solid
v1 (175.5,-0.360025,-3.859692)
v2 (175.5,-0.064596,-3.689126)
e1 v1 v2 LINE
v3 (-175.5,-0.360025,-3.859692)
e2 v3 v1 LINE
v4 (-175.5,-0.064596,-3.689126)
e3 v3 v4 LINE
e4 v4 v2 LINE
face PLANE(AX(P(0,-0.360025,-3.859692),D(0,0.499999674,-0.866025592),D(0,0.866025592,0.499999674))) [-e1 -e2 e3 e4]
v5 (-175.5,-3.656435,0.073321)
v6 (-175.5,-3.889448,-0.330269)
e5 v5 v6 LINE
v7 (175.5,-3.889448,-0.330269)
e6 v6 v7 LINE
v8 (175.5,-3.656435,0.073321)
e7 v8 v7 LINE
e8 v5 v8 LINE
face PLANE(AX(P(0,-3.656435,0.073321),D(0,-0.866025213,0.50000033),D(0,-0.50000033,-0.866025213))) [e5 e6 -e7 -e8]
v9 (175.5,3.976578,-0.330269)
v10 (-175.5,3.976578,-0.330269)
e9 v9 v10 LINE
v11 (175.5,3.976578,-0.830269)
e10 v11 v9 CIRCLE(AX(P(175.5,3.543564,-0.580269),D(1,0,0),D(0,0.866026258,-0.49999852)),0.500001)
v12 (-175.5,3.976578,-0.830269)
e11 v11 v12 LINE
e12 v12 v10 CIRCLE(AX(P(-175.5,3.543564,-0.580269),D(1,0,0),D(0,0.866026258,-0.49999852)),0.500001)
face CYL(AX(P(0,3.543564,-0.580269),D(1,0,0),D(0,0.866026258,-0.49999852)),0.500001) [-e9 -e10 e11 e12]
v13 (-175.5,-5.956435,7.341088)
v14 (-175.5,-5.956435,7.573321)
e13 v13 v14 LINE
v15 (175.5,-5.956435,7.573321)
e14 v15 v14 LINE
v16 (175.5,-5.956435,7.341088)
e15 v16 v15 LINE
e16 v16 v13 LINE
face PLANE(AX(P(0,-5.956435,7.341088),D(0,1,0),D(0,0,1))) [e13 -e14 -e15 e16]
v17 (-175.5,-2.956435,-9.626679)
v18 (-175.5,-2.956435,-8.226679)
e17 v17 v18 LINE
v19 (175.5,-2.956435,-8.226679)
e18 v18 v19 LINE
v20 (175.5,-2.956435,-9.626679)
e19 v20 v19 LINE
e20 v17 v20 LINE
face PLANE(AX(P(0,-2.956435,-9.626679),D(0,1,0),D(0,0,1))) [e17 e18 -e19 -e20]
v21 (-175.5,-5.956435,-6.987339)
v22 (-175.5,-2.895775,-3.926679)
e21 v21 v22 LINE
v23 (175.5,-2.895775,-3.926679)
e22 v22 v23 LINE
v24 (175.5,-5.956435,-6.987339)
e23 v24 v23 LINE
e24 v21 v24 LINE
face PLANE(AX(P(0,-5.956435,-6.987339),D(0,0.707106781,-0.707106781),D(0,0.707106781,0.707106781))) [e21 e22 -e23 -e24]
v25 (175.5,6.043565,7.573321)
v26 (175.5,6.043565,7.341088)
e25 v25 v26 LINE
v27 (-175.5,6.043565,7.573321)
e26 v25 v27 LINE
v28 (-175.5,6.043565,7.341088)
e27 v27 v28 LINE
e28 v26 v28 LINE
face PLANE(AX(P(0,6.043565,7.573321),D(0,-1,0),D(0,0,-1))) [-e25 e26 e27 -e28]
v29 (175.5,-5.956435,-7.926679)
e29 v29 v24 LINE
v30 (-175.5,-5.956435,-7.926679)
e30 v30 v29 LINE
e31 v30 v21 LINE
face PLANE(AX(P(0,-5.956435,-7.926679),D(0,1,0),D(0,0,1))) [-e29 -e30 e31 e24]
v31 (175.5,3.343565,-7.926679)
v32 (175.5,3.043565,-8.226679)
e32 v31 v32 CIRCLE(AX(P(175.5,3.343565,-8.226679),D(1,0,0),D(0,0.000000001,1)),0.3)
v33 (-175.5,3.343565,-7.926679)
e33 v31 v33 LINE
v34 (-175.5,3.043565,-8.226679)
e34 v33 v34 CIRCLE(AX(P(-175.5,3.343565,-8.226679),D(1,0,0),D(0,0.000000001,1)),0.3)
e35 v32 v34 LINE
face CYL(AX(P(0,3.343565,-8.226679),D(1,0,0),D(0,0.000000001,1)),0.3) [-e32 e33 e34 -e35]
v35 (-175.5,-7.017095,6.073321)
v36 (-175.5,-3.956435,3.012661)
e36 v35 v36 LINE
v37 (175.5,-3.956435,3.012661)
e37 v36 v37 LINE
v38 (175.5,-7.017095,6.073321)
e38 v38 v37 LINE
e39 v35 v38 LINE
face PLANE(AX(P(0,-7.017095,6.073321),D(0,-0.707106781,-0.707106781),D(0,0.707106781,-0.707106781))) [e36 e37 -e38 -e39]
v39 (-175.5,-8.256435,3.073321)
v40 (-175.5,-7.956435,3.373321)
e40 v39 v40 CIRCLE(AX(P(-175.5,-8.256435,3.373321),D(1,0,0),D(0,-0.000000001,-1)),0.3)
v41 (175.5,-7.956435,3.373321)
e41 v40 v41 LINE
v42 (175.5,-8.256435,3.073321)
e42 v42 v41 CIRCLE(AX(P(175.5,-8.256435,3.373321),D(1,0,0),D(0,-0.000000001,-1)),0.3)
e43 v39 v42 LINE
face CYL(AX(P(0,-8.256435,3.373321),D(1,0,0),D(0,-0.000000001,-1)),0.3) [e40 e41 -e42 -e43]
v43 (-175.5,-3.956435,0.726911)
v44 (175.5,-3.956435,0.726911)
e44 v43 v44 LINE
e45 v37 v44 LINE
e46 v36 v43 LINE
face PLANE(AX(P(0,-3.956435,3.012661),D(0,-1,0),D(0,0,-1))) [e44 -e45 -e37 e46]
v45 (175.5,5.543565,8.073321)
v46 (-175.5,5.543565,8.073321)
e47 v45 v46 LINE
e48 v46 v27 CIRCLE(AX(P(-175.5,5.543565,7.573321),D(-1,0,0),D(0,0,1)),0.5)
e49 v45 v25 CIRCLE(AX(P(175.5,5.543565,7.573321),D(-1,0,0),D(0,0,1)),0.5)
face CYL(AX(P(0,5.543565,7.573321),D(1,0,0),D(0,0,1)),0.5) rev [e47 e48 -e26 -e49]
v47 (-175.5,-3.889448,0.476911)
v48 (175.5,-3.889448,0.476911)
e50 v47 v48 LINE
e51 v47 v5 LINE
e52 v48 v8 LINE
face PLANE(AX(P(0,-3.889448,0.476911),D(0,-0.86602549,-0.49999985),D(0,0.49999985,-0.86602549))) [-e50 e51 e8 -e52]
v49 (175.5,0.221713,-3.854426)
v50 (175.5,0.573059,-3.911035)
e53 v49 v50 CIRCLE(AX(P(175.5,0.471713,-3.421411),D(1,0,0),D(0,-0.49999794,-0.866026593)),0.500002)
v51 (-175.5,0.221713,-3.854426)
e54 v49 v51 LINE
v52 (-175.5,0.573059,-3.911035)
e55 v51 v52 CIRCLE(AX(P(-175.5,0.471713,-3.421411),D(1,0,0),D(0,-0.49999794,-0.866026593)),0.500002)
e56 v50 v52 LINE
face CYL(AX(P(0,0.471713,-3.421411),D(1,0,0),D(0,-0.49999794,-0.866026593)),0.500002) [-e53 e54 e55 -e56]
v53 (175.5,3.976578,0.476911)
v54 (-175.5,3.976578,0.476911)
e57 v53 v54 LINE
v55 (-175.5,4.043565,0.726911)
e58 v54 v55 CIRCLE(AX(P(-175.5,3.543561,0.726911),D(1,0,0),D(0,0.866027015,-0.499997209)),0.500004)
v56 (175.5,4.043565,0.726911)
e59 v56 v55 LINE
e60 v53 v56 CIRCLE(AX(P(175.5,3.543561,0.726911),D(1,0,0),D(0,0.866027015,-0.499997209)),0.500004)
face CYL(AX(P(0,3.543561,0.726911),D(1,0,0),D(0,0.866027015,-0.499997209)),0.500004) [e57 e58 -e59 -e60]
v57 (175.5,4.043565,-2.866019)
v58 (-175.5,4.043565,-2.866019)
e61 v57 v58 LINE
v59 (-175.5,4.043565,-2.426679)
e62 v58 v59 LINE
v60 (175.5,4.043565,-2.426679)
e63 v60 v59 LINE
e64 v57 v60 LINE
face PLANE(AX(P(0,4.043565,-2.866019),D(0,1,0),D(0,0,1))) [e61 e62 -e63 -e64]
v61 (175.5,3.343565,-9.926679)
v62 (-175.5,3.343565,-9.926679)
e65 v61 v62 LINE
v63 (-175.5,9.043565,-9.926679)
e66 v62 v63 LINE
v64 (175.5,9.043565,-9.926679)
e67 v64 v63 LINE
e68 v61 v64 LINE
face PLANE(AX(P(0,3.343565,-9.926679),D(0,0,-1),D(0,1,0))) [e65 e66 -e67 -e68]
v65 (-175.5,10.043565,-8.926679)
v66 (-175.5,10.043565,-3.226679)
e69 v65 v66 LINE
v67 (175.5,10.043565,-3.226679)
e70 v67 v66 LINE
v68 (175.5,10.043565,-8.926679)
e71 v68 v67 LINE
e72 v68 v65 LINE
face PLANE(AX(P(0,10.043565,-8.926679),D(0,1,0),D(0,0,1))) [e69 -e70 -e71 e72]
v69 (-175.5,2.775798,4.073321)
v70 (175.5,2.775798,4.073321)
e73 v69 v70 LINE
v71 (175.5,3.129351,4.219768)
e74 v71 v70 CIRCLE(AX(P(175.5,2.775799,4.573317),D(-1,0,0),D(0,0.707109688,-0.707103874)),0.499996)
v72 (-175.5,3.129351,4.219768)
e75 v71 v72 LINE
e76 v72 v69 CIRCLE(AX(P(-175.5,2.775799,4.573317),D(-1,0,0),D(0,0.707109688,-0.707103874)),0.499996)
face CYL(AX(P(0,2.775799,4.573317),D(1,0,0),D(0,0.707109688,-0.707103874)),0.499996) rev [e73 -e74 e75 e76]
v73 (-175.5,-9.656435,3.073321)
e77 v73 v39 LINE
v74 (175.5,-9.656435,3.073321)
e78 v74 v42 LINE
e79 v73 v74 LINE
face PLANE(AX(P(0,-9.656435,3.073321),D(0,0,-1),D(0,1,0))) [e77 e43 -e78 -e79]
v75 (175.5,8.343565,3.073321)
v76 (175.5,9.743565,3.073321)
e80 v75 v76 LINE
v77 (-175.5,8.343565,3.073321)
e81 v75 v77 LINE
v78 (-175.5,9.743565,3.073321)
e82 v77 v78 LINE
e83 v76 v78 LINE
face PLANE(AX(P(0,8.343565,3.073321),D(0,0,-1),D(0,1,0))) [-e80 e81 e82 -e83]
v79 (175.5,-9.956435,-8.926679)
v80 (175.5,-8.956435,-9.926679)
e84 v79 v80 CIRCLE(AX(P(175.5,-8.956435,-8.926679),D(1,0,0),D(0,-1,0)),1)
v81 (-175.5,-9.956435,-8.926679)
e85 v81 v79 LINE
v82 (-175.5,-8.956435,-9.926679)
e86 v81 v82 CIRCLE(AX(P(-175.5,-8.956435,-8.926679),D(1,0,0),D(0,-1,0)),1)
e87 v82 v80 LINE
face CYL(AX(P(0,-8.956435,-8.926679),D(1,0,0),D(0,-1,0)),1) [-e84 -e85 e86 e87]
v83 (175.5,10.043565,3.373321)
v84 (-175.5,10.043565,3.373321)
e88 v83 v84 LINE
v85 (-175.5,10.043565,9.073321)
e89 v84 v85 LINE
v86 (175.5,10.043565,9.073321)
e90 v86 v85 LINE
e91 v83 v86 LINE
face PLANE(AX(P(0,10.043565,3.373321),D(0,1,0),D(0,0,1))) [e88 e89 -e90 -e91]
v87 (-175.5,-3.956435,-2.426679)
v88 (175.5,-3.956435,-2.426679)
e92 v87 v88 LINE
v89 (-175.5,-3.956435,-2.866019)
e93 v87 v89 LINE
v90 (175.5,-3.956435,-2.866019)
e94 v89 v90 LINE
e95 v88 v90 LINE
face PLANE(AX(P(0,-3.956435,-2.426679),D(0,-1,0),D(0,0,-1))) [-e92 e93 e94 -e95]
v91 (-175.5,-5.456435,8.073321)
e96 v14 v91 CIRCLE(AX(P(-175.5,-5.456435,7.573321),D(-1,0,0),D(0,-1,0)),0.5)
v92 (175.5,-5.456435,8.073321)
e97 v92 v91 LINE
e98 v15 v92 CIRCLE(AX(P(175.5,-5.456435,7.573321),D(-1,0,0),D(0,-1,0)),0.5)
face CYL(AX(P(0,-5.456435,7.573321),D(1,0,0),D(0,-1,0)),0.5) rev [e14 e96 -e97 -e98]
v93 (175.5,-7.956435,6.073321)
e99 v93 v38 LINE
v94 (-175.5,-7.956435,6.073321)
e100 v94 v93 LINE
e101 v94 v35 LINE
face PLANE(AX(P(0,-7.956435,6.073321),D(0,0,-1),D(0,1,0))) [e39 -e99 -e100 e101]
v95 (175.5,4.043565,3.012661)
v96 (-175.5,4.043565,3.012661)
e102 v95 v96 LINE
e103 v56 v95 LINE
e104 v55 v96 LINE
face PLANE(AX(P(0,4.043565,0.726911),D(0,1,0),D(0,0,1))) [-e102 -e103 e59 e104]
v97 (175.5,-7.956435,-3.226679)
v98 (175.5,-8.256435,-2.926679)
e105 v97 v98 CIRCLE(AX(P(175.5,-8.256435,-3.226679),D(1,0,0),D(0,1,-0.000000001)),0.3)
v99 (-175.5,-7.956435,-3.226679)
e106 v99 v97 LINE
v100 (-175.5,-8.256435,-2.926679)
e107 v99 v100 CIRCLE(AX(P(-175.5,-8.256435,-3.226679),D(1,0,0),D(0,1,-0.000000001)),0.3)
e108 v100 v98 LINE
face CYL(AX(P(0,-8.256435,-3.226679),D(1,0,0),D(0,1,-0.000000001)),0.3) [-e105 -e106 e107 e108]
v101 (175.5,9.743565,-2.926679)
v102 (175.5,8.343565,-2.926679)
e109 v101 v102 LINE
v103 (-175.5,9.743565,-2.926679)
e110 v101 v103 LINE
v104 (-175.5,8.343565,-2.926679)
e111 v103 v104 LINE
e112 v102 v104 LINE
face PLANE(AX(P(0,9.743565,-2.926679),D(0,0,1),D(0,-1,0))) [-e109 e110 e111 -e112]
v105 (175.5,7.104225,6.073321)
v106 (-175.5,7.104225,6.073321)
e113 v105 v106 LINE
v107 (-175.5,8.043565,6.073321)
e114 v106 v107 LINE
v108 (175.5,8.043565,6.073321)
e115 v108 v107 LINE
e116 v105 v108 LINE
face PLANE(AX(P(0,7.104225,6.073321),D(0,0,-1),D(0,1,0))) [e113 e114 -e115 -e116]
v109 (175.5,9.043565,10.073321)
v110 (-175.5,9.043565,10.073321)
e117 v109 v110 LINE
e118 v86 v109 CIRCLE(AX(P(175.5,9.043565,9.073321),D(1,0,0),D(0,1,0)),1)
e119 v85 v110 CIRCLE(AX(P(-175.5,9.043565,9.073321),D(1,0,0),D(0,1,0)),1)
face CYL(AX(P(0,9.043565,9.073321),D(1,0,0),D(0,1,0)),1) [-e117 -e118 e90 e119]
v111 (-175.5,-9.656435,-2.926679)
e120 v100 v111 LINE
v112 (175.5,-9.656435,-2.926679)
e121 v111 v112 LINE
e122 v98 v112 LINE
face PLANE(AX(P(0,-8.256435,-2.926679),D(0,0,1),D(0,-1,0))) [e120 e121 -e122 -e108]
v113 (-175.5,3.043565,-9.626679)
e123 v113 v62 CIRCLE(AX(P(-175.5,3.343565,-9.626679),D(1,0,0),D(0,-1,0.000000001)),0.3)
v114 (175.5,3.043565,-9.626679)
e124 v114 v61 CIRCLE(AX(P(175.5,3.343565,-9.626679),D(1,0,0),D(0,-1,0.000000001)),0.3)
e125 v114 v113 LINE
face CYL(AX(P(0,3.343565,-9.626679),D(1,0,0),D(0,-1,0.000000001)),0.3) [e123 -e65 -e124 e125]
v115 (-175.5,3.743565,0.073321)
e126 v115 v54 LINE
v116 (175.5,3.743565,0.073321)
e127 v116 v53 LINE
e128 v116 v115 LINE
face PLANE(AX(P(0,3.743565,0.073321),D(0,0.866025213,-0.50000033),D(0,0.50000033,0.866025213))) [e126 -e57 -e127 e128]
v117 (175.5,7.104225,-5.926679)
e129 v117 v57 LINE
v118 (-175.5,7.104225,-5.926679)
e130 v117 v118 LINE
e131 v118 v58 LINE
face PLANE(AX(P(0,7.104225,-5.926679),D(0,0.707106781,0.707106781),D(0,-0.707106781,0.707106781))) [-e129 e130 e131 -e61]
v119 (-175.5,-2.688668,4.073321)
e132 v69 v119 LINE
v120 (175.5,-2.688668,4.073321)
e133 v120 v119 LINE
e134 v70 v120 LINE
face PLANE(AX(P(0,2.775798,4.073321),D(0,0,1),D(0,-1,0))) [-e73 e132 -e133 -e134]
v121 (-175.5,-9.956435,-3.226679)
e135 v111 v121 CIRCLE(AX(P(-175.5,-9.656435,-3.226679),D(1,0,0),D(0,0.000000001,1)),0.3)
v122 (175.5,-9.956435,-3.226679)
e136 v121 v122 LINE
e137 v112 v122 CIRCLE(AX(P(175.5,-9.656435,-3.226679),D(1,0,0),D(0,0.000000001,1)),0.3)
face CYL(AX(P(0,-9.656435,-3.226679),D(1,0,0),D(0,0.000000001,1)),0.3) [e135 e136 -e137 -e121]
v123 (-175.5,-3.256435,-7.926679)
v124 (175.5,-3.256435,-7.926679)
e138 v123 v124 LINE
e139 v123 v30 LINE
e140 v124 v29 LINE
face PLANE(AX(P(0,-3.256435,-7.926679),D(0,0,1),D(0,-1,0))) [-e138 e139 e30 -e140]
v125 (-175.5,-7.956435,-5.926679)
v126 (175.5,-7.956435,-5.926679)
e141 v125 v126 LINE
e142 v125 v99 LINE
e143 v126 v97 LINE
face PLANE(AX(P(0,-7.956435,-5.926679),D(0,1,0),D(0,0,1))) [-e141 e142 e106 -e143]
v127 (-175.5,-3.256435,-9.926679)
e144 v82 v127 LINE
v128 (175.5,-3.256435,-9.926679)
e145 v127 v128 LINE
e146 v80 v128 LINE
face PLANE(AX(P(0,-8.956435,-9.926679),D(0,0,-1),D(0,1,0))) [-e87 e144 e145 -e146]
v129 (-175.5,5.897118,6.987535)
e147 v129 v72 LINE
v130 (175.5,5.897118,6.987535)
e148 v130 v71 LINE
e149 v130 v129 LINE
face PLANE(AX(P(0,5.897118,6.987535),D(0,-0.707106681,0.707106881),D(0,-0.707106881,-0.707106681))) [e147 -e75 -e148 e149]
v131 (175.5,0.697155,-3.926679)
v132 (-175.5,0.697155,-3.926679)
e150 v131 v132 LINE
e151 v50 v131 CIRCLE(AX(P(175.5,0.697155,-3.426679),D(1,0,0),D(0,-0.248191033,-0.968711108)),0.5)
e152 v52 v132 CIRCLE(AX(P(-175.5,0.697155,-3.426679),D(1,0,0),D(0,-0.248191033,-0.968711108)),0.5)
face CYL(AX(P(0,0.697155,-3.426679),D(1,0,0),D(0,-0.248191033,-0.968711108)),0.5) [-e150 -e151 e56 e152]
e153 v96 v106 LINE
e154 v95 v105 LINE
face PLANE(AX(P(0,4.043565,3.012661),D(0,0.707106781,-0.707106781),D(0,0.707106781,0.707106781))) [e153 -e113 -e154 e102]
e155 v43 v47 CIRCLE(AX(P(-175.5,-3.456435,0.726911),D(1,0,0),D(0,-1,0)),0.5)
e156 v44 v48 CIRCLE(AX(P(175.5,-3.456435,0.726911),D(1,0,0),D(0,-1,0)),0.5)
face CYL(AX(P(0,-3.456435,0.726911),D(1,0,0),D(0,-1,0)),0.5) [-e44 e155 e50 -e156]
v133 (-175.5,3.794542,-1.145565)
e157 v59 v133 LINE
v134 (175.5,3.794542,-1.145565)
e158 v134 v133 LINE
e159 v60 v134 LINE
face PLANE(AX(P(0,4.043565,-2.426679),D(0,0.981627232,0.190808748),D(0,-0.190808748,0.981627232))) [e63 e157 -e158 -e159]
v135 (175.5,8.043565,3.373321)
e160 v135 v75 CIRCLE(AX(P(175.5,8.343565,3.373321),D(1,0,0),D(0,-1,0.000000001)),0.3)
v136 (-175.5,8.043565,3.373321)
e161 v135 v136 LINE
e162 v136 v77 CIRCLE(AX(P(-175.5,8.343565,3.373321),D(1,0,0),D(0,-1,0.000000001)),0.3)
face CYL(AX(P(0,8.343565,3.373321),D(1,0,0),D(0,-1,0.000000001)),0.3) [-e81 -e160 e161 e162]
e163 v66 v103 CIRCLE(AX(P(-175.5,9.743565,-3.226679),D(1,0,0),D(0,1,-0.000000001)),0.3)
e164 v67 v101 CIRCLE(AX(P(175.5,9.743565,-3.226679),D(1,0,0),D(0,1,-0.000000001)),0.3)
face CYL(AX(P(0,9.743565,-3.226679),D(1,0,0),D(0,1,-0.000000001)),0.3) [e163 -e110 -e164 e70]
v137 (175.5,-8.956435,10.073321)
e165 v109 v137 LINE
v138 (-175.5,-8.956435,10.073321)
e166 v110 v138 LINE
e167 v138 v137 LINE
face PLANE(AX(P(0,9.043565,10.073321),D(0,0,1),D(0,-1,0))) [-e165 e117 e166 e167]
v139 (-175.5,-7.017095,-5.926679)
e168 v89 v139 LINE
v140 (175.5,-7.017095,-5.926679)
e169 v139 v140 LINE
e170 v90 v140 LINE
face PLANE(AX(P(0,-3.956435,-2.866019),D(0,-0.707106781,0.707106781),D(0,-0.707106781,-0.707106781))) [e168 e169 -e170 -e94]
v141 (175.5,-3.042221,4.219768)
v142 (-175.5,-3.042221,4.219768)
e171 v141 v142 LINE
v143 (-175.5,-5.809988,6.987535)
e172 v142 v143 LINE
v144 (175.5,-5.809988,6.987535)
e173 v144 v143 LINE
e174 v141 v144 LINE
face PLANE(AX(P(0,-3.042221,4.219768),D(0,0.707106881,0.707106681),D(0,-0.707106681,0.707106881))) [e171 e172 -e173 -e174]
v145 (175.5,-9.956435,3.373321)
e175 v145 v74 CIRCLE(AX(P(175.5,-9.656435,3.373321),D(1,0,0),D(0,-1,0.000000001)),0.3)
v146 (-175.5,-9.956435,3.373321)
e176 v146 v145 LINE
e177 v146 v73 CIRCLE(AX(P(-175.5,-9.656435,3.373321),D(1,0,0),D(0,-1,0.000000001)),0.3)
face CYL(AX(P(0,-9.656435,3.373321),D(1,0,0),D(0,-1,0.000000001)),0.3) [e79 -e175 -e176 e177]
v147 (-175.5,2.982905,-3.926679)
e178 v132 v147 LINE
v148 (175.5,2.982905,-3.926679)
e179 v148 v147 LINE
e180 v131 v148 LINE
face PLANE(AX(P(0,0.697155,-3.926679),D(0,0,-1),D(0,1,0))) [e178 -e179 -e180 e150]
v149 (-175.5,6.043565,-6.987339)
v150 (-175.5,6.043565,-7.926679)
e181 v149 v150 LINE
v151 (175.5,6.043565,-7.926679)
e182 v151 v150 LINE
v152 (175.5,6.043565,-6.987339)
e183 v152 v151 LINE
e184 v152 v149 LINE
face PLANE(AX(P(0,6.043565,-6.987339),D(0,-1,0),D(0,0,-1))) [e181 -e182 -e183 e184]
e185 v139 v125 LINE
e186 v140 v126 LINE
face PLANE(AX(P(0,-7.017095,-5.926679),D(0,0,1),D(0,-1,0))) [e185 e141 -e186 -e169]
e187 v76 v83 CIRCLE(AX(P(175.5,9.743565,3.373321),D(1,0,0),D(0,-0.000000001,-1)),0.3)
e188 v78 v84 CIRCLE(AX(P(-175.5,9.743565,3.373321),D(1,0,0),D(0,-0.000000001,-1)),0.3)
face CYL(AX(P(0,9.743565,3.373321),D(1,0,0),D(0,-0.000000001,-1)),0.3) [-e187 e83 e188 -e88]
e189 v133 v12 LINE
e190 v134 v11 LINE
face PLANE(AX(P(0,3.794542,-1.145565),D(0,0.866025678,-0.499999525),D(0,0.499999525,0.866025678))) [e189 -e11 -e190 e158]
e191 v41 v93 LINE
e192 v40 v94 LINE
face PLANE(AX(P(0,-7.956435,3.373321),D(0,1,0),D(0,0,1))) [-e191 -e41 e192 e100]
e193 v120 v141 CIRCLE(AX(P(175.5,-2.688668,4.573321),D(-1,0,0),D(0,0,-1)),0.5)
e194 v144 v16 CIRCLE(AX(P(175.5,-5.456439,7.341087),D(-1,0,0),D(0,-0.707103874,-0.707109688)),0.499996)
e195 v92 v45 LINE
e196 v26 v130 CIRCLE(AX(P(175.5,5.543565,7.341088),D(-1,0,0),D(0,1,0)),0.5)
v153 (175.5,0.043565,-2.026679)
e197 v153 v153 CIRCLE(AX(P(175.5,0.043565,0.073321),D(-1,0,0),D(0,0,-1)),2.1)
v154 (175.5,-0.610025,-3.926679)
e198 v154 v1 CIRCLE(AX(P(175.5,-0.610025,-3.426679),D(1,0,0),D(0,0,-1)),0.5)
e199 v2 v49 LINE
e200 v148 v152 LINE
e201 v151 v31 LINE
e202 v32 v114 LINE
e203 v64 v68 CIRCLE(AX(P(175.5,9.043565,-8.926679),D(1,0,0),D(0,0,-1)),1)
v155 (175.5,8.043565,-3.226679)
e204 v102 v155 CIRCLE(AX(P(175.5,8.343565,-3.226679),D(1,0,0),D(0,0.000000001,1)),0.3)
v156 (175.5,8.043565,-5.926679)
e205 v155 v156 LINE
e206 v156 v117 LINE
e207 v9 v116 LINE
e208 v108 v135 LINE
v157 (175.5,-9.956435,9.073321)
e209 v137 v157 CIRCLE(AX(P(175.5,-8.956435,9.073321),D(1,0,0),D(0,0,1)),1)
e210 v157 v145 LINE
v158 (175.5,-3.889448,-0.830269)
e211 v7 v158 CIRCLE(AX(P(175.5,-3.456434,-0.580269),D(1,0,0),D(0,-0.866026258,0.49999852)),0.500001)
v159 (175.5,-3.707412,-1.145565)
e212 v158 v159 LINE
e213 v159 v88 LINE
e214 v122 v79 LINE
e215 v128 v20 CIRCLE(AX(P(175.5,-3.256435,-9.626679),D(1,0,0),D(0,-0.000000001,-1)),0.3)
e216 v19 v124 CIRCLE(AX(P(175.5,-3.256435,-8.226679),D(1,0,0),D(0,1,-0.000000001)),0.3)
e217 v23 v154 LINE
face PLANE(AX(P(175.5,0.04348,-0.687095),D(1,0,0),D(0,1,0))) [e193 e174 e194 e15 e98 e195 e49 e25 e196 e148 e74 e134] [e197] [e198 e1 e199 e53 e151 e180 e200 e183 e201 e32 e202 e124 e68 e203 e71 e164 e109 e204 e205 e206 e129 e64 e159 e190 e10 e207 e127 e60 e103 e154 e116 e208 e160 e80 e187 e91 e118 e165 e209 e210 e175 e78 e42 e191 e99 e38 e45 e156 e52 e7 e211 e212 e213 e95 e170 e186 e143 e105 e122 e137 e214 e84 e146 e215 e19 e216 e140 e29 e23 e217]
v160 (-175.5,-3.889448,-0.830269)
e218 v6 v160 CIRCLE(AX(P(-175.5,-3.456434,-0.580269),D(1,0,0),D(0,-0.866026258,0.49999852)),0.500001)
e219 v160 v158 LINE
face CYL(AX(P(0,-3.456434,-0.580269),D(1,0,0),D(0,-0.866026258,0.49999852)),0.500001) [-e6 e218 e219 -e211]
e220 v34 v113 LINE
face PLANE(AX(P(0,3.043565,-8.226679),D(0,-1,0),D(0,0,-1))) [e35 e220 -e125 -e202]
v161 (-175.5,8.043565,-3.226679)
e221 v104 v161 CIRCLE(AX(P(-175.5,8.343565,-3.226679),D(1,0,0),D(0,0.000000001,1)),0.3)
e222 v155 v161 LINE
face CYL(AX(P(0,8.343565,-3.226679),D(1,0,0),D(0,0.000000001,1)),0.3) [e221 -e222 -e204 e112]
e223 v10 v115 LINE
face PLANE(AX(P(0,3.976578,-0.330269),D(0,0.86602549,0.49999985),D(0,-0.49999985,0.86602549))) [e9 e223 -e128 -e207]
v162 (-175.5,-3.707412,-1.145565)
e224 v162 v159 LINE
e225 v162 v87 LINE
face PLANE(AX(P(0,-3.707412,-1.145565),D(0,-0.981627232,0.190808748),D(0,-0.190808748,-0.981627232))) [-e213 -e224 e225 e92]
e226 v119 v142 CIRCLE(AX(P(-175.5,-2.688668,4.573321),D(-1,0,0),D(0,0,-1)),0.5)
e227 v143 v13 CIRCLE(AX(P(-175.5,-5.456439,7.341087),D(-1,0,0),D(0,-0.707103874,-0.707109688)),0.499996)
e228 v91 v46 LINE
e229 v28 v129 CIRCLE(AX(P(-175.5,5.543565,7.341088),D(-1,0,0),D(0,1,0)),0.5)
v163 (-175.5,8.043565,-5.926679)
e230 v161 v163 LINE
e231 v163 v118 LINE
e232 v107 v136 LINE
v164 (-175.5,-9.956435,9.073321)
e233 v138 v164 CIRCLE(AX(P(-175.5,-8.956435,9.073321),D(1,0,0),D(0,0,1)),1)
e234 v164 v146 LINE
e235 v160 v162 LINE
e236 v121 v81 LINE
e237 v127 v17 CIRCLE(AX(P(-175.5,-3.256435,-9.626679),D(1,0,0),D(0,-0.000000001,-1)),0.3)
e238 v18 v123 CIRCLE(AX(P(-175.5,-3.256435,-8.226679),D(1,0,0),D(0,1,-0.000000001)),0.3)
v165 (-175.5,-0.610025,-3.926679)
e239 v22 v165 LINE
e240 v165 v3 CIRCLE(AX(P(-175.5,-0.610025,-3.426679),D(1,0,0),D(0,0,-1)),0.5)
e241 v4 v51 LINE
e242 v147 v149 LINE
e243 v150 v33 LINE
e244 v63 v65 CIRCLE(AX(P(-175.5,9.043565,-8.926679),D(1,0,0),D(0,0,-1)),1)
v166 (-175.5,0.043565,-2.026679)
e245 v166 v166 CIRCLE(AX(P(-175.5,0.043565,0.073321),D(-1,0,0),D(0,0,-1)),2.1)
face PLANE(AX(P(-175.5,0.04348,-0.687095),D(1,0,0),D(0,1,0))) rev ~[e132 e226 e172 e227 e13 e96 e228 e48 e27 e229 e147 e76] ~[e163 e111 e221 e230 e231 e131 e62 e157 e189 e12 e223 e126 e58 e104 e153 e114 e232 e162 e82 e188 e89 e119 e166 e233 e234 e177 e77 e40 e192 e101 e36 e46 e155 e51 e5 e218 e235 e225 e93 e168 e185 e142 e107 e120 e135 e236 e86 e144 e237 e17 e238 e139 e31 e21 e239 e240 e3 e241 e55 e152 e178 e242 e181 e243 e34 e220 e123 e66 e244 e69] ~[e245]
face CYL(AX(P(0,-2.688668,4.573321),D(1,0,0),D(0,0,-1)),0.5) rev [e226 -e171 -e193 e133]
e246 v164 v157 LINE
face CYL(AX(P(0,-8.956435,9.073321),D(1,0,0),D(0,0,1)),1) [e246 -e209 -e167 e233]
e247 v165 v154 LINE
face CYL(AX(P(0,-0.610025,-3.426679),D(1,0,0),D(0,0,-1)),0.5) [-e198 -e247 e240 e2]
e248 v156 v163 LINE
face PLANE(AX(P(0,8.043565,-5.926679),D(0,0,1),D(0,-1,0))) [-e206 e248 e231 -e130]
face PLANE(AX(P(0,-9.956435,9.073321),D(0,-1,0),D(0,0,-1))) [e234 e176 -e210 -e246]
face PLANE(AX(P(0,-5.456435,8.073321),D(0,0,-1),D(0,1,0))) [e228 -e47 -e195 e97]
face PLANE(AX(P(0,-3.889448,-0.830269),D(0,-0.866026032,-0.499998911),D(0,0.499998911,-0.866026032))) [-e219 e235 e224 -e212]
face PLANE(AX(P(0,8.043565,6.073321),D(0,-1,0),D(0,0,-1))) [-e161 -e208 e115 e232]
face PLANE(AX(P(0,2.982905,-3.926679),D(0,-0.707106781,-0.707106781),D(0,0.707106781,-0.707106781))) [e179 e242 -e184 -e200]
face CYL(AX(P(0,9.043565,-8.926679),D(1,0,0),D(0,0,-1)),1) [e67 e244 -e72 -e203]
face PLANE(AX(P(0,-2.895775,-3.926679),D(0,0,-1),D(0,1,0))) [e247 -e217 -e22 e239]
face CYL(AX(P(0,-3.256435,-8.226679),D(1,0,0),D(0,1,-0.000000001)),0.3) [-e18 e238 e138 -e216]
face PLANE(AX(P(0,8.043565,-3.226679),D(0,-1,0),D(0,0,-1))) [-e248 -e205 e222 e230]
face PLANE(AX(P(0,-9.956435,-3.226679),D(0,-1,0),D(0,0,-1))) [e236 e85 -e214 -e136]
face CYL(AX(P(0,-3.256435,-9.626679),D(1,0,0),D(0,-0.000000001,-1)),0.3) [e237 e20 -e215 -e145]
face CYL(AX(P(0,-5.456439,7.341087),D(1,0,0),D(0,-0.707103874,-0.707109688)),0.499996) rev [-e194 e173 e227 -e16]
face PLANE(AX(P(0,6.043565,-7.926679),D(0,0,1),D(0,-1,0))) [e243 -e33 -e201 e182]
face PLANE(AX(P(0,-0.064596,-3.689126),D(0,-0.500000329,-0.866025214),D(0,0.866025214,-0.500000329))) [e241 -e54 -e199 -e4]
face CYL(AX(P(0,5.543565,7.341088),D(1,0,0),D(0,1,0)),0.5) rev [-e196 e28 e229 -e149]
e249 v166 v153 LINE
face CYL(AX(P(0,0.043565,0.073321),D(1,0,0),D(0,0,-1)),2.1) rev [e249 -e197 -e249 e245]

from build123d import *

# Parameters (mm, degrees)
F1_DEPTH = 175.5


# Not quite as in the source:
# - ends of sketch curves that miss each other by under 0.0002 mm in the source are joined


with BuildPart() as f1:
    # F0 (on Right) → F1 (new body, symmetric)
    with BuildSketch(Plane.YZ):
        with BuildLine():
            Line((9.043565, 10.073321), (0.043565, 10.073321))
            Line((0.043565, 10.073321), (-8.956435, 10.073321))
            ThreePointArc((-8.956435, 10.073321), (-9.6635417812, 9.7804277812), (-9.956435, 9.073321))
            Line((-9.956435, 9.073321), (-9.956435, 3.373321))
            ThreePointArc((-9.956435, 3.373321), (-9.8685670344, 3.1611889656), (-9.656435, 3.073321))
            Line((-9.656435, 3.073321), (-8.256435, 3.073321))
            ThreePointArc((-8.256435, 3.073321), (-8.0443029656, 3.1611889656), (-7.956435, 3.373321))
            Line((-7.956435, 3.373321), (-7.956435, 6.073321))
            Line((-7.956435, 6.073321), (-7.017095, 6.073321))
            Line((-7.017095, 6.073321), (-3.956435, 3.012661))
            Line((-3.956435, 3.012661), (-3.956435, 0.726911))
            ThreePointArc((-3.956435, 0.726911), (-3.9393979324, 0.5975015494), (-3.8894477764, 0.4769111291))
            Line((-3.8894477764, 0.4769111291), (-3.656435, 0.073321))
            Line((-3.656435, 0.073321), (-3.889448, -0.330269))
            ThreePointArc((-3.889448, -0.330269), (-3.956435, -0.580269), (-3.8894477764, -0.8302688709))
            Line((-3.8894477764, -0.8302688709), (-3.707412, -1.145565))
            Line((-3.707412, -1.145565), (-3.956435, -2.426679))
            Line((-3.956435, -2.426679), (-3.956435, -2.866019))
            Line((-3.956435, -2.866019), (-7.017095, -5.926679))
            Line((-7.017095, -5.926679), (-7.956435, -5.926679))
            Line((-7.956435, -5.926679), (-7.956435, -3.226679))
            ThreePointArc((-7.956435, -3.226679), (-8.0443029656, -3.0145469656), (-8.256435, -2.926679))
            Line((-8.256435, -2.926679), (-9.656435, -2.926679))
            ThreePointArc((-9.656435, -2.926679), (-9.8685670344, -3.0145469656), (-9.956435, -3.226679))
            Line((-9.956435, -3.226679), (-9.956435, -8.926679))
            ThreePointArc((-9.956435, -8.926679), (-9.6635417812, -9.6337857812), (-8.956435, -9.926679))
            Line((-8.956435, -9.926679), (-3.256435, -9.926679))
            ThreePointArc((-3.256435, -9.926679), (-3.0443029656, -9.8388110344), (-2.956435, -9.626679))
            Line((-2.956435, -9.626679), (-2.956435, -8.226679))
            ThreePointArc((-2.956435, -8.226679), (-3.0443029656, -8.0145469656), (-3.256435, -7.926679))
            Line((-3.256435, -7.926679), (-5.956435, -7.926679))
            Line((-5.956435, -7.926679), (-5.956435, -6.987339))
            Line((-5.956435, -6.987339), (-2.895775, -3.926679))
            Line((-2.895775, -3.926679), (-0.610025, -3.926679))
            ThreePointArc((-0.610025, -3.926679), (-0.4806155494, -3.9096419324), (-0.3600251291, -3.8596917764))
            Line((-0.3600251291, -3.8596917764), (-0.0645959325, -3.6891257984))
            Line((-0.0645959325, -3.6891257984), (0.2217128734, -3.8544264098))
            ThreePointArc((0.2217128734, -3.8544264098), (0.3921793907, -3.9150473077), (0.5730594828, -3.9110345539))
            ThreePointArc((0.5730594828, -3.9110345539), (0.6346161199, -3.9227524708), (0.697155, -3.926679))
            Line((0.697155, -3.926679), (2.982905, -3.926679))
            Line((2.982905, -3.926679), (6.043565, -6.987339))
            Line((6.043565, -6.987339), (6.043565, -7.926679))
            Line((6.043565, -7.926679), (3.343565, -7.926679))
            ThreePointArc((3.343565, -7.926679), (3.1314329656, -8.0145469656), (3.043565, -8.226679))
            Line((3.043565, -8.226679), (3.043565, -9.626679))
            ThreePointArc((3.043565, -9.626679), (3.1314329656, -9.8388110344), (3.343565, -9.926679))
            Line((3.343565, -9.926679), (9.043565, -9.926679))
            ThreePointArc((9.043565, -9.926679), (9.7506717812, -9.6337857812), (10.043565, -8.926679))
            Line((10.043565, -8.926679), (10.043565, -3.226679))
            ThreePointArc((10.043565, -3.226679), (9.9556970344, -3.0145469656), (9.743565, -2.926679))
            Line((9.743565, -2.926679), (8.343565, -2.926679))
            ThreePointArc((8.343565, -2.926679), (8.1314329656, -3.0145469656), (8.043565, -3.226679))
            Line((8.043565, -3.226679), (8.043565, -5.926679))
            Line((8.043565, -5.926679), (7.104225, -5.926679))
            Line((7.104225, -5.926679), (4.043565, -2.866019))
            Line((4.043565, -2.866019), (4.043565, -2.426679))
            Line((4.043565, -2.426679), (3.794542, -1.145565))
            Line((3.794542, -1.145565), (3.976578, -0.830269))
            ThreePointArc((3.976578, -0.830269), (4.043565, -0.580269), (3.9765777764, -0.3302691291))
            Line((3.9765777764, -0.3302691291), (3.743565, 0.073321))
            Line((3.743565, 0.073321), (3.976578, 0.476911))
            ThreePointArc((3.976578, 0.476911), (4.0265279324, 0.5975015494), (4.043565, 0.726911))
            Line((4.043565, 0.726911), (4.043565, 3.012661))
            Line((4.043565, 3.012661), (7.104225, 6.073321))
            Line((7.104225, 6.073321), (8.043565, 6.073321))
            Line((8.043565, 6.073321), (8.043565, 3.373321))
            ThreePointArc((8.043565, 3.373321), (8.1314329656, 3.1611889656), (8.343565, 3.073321))
            Line((8.343565, 3.073321), (9.743565, 3.073321))
            ThreePointArc((9.743565, 3.073321), (9.9556970344, 3.1611889656), (10.043565, 3.373321))
            Line((10.043565, 3.373321), (10.043565, 9.073321))
            ThreePointArc((10.043565, 9.073321), (9.7506717812, 9.7804277812), (9.043565, 10.073321))
        make_face()
        with BuildLine():
            ThreePointArc((0.043565, 2.173321), (2.143565, 0.073321), (0.043565, -2.026679))
            ThreePointArc((0.043565, -2.026679), (-2.056435, 0.073321), (0.043565, 2.173321))
        make_face(mode=Mode.SUBTRACT)
        with BuildLine():
            Line((2.775798, 4.073321), (0.043565, 4.073321))
            Line((0.043565, 4.073321), (-2.688668, 4.073321))
            ThreePointArc((-2.688668, 4.073321), (-2.8800097162, 4.1113812337), (-3.0422213906, 4.2197676094))
            Line((-3.0422213906, 4.2197676094), (-5.809988, 6.987535))
            ThreePointArc((-5.809988, 6.987535), (-5.9183747663, 7.1497462838), (-5.956435, 7.341088))
            Line((-5.956435, 7.341088), (-5.956435, 7.573321))
            ThreePointArc((-5.956435, 7.573321), (-5.8099883906, 7.9268743906), (-5.456435, 8.073321))
            Line((-5.456435, 8.073321), (0.043565, 8.073321))
            Line((0.043565, 8.073321), (5.543565, 8.073321))
            ThreePointArc((5.543565, 8.073321), (5.8971183906, 7.9268743906), (6.043565, 7.573321))
            Line((6.043565, 7.573321), (6.043565, 7.341088))
            ThreePointArc((6.043565, 7.341088), (6.0055047663, 7.1497462838), (5.8971183906, 6.9875346094))
            Line((5.8971183906, 6.9875346094), (3.129351, 4.219768))
            ThreePointArc((3.129351, 4.219768), (2.9671397162, 4.1113812337), (2.775798, 4.073321))
        make_face(mode=Mode.SUBTRACT)
    extrude(amount=F1_DEPTH, both=True)


solid = f1.part
